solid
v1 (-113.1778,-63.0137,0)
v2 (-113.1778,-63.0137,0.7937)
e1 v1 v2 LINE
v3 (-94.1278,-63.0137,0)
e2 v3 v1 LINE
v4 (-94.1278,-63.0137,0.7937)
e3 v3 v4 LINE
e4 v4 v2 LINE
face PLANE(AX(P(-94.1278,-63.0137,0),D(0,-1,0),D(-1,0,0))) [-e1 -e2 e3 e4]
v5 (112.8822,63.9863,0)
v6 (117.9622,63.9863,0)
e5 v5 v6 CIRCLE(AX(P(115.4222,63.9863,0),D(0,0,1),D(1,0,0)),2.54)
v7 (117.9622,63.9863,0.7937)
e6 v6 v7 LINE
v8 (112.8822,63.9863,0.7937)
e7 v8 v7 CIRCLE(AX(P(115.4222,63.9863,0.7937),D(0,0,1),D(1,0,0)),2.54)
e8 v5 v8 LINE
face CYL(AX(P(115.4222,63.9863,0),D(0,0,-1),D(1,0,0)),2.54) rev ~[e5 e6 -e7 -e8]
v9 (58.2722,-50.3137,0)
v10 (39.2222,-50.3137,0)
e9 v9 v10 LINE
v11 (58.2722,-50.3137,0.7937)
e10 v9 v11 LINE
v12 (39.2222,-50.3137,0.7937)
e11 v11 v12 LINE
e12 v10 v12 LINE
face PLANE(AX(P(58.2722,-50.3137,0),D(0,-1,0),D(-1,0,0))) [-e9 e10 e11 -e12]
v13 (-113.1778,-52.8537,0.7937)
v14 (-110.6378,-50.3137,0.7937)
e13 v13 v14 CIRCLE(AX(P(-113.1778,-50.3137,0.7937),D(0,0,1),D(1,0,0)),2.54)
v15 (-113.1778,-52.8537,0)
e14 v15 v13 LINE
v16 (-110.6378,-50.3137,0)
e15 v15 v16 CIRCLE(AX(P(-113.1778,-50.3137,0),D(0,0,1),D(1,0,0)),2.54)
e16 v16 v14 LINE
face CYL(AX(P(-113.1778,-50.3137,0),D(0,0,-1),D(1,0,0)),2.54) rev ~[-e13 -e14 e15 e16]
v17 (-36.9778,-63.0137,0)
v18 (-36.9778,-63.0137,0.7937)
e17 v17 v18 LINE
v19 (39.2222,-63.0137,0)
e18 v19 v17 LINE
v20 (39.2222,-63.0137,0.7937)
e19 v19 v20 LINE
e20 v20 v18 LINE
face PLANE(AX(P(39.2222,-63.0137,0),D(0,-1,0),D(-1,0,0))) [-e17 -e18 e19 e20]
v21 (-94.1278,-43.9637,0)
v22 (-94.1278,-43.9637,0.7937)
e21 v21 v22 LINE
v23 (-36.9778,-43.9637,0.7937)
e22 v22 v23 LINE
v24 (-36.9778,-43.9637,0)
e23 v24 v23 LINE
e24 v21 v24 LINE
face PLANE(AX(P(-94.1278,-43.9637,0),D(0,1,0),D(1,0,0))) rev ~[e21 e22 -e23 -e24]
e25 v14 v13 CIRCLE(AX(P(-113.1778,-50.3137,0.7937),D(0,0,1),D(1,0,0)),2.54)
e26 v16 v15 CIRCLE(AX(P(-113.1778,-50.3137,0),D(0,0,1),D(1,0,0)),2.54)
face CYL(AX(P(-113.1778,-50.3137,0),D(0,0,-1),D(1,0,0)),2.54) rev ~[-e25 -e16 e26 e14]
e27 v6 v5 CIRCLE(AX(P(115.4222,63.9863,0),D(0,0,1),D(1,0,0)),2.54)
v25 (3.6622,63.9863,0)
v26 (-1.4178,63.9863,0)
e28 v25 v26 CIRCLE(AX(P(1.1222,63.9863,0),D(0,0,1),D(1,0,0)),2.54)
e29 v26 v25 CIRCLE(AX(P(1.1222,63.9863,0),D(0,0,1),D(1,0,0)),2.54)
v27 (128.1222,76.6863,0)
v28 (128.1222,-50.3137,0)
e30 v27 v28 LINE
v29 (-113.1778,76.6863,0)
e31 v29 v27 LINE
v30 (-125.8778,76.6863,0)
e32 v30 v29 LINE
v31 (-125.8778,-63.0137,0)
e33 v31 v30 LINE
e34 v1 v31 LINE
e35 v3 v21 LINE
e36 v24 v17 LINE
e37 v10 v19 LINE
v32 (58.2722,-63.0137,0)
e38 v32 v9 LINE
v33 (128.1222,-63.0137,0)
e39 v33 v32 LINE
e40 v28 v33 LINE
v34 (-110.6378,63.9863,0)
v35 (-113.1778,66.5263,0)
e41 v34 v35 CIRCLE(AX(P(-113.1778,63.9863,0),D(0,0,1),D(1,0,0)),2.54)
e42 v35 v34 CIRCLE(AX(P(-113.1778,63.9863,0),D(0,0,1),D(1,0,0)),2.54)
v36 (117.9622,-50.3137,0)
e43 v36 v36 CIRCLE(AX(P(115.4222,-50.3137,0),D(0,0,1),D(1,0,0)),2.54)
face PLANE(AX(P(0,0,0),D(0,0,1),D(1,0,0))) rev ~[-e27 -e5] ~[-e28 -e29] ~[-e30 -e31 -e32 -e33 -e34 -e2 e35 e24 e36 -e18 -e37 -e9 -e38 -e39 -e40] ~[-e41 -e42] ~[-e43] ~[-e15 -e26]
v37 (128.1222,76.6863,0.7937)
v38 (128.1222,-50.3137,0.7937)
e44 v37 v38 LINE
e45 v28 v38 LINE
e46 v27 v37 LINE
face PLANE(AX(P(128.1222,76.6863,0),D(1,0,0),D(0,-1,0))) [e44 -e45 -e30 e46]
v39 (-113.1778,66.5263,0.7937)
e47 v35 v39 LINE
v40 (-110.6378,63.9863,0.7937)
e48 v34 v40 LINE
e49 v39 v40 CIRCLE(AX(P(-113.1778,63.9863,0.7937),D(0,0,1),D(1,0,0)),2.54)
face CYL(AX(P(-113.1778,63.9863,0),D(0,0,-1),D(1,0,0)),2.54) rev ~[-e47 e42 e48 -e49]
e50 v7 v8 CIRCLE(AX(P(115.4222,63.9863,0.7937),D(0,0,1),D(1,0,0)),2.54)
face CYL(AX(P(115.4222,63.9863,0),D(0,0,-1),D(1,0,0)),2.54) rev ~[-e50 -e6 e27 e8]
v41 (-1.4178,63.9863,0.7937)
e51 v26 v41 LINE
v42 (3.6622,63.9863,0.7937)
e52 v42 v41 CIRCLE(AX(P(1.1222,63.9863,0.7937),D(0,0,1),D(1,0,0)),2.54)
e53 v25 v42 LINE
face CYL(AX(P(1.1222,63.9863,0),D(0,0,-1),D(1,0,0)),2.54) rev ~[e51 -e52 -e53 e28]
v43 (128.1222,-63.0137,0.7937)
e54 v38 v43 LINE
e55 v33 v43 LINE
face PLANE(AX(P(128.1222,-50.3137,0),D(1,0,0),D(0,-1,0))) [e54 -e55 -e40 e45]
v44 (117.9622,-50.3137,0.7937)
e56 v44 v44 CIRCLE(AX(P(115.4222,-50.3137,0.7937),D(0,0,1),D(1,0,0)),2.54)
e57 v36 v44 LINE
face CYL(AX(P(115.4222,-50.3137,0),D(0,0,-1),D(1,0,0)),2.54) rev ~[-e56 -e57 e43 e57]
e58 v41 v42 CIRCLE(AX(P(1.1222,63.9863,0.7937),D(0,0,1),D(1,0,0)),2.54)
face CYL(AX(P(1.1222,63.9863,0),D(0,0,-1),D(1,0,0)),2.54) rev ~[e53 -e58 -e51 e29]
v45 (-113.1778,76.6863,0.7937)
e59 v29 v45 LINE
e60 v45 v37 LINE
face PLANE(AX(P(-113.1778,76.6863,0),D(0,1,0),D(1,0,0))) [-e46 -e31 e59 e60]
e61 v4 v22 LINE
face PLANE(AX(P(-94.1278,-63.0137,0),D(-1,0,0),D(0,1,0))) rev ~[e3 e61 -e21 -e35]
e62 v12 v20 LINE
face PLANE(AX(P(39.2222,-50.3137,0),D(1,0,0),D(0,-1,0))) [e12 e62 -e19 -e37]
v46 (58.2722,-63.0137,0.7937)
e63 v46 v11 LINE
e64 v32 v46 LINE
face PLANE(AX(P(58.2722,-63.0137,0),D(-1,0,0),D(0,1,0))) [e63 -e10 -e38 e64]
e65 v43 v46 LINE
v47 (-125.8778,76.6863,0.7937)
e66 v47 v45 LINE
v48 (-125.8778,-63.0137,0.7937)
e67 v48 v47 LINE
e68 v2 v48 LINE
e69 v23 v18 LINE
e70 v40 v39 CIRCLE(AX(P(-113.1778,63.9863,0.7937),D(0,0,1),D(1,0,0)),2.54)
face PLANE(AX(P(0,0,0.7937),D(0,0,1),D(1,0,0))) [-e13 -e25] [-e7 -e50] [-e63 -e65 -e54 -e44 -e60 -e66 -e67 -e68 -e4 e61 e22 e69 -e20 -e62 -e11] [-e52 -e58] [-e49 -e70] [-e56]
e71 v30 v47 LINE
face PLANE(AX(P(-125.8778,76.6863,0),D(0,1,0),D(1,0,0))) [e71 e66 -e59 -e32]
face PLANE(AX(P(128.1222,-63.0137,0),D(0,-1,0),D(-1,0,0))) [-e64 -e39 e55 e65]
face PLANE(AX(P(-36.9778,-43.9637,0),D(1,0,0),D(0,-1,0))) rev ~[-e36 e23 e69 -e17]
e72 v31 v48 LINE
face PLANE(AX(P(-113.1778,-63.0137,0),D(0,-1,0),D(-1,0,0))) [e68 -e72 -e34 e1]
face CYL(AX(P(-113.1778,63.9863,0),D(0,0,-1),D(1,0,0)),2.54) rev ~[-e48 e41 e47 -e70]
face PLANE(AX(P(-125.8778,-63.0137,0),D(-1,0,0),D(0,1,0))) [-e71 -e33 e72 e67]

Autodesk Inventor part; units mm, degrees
ref_plane "YZ Plane" through (0, 0, 0) normal (1, 0, 0) x (0, 1, 0)
ref_plane "XZ Plane" through (0, 0, 0) normal (0, 1, 0) x (-1, 0, 0)
ref_plane "XY Plane" through (0, 0, 0) normal (0, 0, 1) x (1, 0, 0)
sketch "Sketch1" plane through (0, 0, 0) normal (0, 0, 1) x (1, 0, 0)
  line L0 (-125.8778, 76.6863) -> (128.1222, 76.6863)
  line L1 (128.1222, 76.6863) -> (128.1222, -63.0137)
  line L2 (128.1222, -63.0137) -> (-125.8778, -63.0137)
  line L3 (-125.8778, -63.0137) -> (-125.8778, 76.6863)
  line L4 (-125.8778, -63.0137) -> (-94.1278, -63.0137)
  line L5 (-94.1278, -63.0137) -> (-94.1278, -43.9637)
  line L6 (-94.1278, -43.9637) -> (-36.9778, -43.9637)
  line L7 (-36.9778, -43.9637) -> (-36.9778, -63.0137)
  line L8 (128.1222, -63.0137) -> (58.2722, -63.0137)
  line L9 (58.2722, -63.0137) -> (58.2722, -50.3137)
  line L10 (58.2722, -50.3137) -> (39.2222, -50.3137)
  line L11 (39.2222, -50.3137) -> (39.2222, -63.0137)
  line L12 (-125.8778, 76.6863) -> (-113.1778, 76.6863)
  line L13 (-113.1778, 76.6863) -> (-113.1778, 63.9863)
  circle A0 centre (-113.1778, 63.9863) radius 2.54
  line L14 (-113.1778, 63.9863) -> (1.1222, 63.9863)
  circle A1 centre (1.1222, 63.9863) radius 2.54
  line L15 (1.1222, 63.9863) -> (115.4222, 63.9863)
  circle A2 centre (115.4222, 63.9863) radius 2.54
  line L16 (-125.8778, -63.0137) -> (-113.1778, -63.0137)
  line L17 (-113.1778, -63.0137) -> (-113.1778, -50.3137)
  circle A3 centre (-113.1778, -50.3137) radius 2.54
  line L18 (128.1222, -63.0137) -> (128.1222, -50.3137)
  line L19 (128.1222, -50.3137) -> (115.4222, -50.3137)
  circle A4 centre (115.4222, -50.3137) radius 2.54
  point P0 (0, 0)
  dimension "d0" = 254
  dimension "d1" = 139.7
  dimension "d6" = 31.75
  dimension "d7" = 19.05
  dimension "d8" = 57.15
  dimension "d9" = 69.85
  dimension "d10" = 12.7
  dimension "d11" = 19.05
  dimension "d14" = 12.7
  dimension "d15" = 12.7
  dimension "d16" = 5.08
  dimension "d17" = 114.3
  dimension "d18" = 5.08
  dimension "d19" = 114.3
  dimension "d20" = 5.08
  dimension "d21" = 12.7
  dimension "d22" = 12.7
  dimension "d23" = 5.08
  dimension "d24" = 12.7
  dimension "d25" = 12.7
  dimension "d26" = 5.08
extrude "Extrusion4" add sketch "Sketch1" along normal blind 0.7937 contours L0 L1 L2 L9 L10 L11 L7 L6 L5 L3
properties part number "Top Intake Poly (Sponsor Panel)"
